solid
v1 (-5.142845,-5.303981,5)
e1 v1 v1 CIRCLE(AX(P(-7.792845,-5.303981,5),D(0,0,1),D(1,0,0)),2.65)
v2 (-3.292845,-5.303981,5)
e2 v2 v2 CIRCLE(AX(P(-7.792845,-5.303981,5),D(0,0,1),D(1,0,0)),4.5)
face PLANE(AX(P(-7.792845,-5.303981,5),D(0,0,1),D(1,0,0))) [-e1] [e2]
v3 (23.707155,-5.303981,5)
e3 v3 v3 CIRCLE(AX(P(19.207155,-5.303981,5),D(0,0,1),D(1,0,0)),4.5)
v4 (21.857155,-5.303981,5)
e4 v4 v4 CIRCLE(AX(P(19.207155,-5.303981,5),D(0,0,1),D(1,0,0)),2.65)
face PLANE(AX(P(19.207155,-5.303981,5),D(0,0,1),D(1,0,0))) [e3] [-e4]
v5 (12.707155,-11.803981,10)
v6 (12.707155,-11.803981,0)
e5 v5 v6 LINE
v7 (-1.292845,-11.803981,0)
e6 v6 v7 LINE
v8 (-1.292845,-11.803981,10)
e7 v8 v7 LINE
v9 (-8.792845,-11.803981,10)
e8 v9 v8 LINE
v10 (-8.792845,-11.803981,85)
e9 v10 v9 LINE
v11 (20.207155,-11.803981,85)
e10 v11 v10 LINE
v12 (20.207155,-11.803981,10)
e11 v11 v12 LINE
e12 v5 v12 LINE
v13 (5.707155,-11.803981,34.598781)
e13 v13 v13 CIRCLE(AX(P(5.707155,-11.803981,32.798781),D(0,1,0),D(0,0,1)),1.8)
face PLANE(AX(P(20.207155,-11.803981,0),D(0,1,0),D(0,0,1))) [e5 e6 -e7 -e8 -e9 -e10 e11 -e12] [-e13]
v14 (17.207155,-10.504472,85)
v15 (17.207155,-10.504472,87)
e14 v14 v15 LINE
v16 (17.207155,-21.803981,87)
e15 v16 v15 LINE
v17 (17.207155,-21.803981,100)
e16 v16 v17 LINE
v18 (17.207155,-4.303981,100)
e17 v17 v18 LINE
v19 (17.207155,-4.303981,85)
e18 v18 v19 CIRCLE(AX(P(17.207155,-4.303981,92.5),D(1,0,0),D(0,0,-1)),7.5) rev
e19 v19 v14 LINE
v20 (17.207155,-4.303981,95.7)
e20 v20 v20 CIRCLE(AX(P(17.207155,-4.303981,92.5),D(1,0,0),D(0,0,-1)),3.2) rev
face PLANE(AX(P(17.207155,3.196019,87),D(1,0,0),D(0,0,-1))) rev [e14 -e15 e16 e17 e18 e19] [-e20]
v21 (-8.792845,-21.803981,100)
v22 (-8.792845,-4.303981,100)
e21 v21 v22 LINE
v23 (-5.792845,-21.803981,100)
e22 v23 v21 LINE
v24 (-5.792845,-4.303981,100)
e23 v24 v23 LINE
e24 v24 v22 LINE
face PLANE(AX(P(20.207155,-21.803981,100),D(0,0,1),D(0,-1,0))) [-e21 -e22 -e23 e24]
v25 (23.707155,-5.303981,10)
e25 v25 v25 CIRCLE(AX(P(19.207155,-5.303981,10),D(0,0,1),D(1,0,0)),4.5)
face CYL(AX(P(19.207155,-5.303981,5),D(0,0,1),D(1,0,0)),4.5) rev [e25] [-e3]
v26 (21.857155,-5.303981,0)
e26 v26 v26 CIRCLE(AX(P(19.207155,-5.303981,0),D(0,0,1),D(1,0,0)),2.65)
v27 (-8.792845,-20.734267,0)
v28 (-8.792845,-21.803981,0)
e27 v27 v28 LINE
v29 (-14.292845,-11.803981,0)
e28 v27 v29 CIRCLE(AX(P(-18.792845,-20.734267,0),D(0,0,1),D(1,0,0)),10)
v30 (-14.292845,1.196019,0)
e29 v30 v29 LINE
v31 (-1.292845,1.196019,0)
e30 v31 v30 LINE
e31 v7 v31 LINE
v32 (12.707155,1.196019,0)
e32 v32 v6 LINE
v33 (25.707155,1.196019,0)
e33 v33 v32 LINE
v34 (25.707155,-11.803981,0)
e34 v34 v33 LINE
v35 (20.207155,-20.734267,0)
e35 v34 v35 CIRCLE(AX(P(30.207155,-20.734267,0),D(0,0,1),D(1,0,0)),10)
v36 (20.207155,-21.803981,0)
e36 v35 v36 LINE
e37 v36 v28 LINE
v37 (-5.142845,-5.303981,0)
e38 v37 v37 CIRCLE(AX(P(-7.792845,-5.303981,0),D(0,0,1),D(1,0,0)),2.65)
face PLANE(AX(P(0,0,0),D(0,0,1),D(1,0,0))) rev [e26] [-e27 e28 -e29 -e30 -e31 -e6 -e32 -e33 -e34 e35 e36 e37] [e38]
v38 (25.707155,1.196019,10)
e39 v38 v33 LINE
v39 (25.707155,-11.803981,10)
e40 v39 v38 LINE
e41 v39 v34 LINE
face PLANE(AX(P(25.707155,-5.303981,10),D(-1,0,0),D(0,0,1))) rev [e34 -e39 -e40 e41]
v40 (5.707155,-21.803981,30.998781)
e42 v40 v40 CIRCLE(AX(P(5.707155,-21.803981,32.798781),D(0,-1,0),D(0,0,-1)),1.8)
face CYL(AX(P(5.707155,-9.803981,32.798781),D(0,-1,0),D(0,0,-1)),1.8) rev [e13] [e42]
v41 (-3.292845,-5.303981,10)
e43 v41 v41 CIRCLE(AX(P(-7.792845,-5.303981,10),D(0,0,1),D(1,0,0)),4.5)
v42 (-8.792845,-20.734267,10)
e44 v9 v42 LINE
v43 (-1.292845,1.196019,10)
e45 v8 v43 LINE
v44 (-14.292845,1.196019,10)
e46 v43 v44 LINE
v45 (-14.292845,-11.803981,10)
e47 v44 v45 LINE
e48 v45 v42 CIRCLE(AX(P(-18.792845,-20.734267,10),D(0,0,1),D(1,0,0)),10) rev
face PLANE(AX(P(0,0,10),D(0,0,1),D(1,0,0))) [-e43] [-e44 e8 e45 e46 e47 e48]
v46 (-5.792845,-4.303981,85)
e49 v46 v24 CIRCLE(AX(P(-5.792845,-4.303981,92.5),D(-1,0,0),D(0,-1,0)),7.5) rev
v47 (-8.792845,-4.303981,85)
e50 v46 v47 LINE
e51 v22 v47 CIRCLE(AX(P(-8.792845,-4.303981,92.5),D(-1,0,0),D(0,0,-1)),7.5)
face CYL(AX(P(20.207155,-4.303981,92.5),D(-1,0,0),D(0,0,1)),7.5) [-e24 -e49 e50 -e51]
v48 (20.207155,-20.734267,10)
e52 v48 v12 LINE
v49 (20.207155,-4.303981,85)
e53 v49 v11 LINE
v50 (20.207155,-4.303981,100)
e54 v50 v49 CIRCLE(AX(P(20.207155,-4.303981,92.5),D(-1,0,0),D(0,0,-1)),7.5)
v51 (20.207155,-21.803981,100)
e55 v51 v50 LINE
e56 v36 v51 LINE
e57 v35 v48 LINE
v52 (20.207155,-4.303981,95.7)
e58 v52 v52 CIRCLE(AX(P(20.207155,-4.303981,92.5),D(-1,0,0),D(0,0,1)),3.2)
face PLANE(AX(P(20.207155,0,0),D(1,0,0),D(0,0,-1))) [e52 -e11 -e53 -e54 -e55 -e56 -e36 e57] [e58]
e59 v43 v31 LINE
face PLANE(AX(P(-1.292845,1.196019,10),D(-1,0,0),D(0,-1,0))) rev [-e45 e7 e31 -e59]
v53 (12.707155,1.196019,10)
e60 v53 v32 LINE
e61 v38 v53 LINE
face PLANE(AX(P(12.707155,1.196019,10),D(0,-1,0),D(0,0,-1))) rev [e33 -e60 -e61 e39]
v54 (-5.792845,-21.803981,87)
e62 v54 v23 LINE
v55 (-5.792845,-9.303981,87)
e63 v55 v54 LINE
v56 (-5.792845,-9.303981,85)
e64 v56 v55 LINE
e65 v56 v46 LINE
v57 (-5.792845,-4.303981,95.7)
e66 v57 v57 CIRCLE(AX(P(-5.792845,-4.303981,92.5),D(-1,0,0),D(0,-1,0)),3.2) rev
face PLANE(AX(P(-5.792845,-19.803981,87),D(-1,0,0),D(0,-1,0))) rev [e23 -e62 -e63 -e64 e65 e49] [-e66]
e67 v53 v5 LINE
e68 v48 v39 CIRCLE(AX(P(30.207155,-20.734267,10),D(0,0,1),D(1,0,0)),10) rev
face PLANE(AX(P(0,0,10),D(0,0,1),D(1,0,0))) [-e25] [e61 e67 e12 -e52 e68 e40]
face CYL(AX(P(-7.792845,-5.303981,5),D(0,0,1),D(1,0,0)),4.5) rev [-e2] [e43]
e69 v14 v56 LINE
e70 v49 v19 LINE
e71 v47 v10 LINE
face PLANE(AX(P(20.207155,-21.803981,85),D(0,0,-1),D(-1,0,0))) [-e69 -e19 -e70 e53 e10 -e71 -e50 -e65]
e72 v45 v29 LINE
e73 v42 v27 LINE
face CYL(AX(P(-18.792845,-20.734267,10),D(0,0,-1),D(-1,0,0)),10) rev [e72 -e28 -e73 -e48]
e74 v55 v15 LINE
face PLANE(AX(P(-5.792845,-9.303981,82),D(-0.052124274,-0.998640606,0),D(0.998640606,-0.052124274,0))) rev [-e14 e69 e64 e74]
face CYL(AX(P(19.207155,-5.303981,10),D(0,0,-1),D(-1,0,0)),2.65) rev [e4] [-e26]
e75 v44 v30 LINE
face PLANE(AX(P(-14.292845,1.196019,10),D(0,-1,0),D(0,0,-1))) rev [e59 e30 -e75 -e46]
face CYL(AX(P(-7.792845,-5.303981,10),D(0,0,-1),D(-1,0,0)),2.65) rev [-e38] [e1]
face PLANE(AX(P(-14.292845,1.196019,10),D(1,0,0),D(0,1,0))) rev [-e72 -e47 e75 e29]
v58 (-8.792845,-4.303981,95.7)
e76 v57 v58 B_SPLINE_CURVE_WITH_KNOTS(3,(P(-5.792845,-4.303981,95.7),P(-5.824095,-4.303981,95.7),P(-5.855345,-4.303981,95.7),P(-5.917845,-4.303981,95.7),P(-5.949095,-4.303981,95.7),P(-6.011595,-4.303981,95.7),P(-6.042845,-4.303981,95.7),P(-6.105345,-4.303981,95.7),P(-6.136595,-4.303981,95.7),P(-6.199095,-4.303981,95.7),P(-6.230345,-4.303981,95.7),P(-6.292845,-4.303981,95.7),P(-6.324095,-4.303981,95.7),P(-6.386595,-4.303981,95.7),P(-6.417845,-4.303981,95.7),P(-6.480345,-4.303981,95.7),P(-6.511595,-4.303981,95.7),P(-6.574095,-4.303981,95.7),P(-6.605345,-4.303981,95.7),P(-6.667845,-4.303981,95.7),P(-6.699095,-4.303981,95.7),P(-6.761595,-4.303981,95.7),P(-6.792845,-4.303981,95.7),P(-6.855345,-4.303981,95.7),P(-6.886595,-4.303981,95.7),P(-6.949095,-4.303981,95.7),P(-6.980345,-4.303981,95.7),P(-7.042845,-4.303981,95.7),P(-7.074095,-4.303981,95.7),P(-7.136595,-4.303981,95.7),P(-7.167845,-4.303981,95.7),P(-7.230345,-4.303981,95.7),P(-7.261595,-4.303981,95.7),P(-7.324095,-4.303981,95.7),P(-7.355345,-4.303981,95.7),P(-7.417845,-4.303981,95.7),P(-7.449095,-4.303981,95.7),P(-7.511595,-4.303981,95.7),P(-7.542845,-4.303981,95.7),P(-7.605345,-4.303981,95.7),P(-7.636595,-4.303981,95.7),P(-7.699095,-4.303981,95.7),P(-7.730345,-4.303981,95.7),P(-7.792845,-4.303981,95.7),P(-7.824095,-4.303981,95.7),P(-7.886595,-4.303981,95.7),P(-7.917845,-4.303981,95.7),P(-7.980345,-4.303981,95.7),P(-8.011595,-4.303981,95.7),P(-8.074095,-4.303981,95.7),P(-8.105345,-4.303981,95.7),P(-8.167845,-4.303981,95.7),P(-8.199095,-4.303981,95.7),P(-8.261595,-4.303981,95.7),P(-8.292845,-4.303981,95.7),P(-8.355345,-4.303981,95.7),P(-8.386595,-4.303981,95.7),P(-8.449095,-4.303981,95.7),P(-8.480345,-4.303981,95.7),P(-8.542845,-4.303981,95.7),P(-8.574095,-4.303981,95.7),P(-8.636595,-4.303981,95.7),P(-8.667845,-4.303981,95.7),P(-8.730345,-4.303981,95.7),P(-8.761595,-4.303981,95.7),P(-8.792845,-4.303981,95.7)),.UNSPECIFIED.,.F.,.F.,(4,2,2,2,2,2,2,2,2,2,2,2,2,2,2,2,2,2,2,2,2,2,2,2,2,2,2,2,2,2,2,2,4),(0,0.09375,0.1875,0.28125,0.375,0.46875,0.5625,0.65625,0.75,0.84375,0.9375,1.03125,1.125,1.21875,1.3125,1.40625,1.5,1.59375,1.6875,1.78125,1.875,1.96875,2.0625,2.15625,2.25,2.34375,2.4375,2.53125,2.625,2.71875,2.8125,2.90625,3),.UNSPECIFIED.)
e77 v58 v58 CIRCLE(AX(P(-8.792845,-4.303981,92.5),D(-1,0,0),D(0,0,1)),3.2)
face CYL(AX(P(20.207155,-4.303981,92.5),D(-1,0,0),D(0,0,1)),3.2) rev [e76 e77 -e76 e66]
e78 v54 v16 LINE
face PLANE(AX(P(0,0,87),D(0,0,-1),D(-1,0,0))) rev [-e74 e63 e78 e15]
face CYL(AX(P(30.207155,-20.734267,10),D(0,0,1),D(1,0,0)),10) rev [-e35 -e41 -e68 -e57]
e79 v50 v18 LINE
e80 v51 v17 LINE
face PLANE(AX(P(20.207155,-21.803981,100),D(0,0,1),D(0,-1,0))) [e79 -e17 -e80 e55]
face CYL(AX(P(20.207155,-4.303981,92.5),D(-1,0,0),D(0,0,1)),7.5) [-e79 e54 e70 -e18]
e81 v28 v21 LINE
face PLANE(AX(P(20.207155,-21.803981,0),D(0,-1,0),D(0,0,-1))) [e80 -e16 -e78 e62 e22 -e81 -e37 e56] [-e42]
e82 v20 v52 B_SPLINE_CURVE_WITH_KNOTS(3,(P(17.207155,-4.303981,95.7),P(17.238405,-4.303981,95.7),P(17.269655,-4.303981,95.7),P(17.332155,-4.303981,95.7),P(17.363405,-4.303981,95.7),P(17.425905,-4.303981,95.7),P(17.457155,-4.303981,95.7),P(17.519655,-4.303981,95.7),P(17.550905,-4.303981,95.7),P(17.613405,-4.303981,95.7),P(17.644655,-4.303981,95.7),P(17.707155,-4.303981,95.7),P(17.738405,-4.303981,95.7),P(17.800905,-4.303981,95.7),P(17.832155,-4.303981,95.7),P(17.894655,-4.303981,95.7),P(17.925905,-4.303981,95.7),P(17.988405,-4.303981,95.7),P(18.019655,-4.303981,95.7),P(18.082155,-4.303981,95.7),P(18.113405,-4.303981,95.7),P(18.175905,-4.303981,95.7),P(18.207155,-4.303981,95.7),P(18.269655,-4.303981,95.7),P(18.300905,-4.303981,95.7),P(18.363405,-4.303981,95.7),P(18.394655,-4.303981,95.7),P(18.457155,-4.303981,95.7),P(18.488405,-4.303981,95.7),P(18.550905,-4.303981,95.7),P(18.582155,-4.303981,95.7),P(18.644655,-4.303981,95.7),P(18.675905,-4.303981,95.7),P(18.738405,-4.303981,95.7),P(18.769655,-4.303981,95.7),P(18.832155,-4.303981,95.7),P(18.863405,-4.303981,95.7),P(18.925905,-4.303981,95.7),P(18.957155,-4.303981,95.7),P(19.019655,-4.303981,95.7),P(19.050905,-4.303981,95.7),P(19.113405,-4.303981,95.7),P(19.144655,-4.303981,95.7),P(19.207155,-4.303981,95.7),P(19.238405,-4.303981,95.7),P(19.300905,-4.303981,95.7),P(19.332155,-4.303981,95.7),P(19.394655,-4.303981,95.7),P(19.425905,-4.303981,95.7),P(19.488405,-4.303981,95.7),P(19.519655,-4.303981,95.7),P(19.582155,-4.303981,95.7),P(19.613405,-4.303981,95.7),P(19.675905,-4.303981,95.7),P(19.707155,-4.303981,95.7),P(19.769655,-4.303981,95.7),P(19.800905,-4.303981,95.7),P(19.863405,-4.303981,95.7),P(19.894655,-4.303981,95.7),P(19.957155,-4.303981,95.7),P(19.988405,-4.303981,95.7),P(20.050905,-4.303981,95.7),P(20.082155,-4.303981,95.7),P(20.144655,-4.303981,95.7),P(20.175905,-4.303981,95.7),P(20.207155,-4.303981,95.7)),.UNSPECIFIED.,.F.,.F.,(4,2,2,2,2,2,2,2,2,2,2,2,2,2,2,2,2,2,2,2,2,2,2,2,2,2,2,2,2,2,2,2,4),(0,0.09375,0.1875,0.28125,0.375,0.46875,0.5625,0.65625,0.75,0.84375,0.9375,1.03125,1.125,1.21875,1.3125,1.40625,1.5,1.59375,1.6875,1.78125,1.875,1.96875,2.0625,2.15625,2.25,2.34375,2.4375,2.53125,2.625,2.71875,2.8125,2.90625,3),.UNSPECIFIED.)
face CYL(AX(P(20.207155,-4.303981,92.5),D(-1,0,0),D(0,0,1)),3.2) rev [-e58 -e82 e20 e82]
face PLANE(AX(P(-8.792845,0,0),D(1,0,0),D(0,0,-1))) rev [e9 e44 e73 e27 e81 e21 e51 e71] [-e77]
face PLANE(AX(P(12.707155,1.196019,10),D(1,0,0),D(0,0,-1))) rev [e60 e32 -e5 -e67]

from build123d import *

# Parameters (mm, degrees)
SKETCH_1_W           = 13
SKETCH_1_H           = 13
SKETCH_1_R           = 2.65
EXTRUDE_1_DEPTH      = 10
EXTRUDE_1_2_DEPTH    = 10
SKETCH_2_R           = 4.5
CUT_EXTRUDE_2_DEPTH  = 5
EXTRUDE_2_DEPTH      = 14.5
EXTRUDE_2_DEPTH_BACK = 14.5
SKETCH_4_W           = 85
SKETCH_4_H           = 10
FILLET_6_R           = 10
SKETCH_9_R           = 3.2
EXTRUDE_3_DEPTH      = 29
CUT_EXTRUDE_6_DEPTH  = 13
CUT_EXTRUDE_7_DEPTH  = 5
SKETCH_12_R          = 1.8
CUT_EXTRUDE_8_DEPTH  = 12


with BuildPart() as part:
    # 草图1 → 凸台-拉伸1 (new body)
    with BuildSketch(Plane.XY):
        with Locations((-7.792845361, -5.303981357)):
            Rectangle(SKETCH_1_W, SKETCH_1_H)
        with Locations((-7.792845361, -5.303981357)):
            Circle(SKETCH_1_R, mode=Mode.SUBTRACT)
    extrude(amount=EXTRUDE_1_DEPTH)


with BuildPart() as body_2:
    # 草图1 → Extrude 1 2 (new body)
    with BuildSketch(Plane.XY):
        Polygon((12.707154639, 1.196018643), (25.707154639, 1.196018643), (25.707154639, -5.303981357), (25.707154639, -11.803981357), (12.707154639, -11.803981357), align=None)
        with Locations((19.207154639, -5.303981357)):
            Circle(SKETCH_1_R, mode=Mode.SUBTRACT)
    extrude(amount=EXTRUDE_1_2_DEPTH)


with BuildPart() as cut_extrude_2_tool:
    # 草图2 → 切除-拉伸2 (new body)
    with BuildSketch(Plane.XY.offset(10)):
        with Locations((-7.792845361, -5.303981357)):
            Circle(SKETCH_2_R)
        with Locations((19.207154639, -5.303981357)):
            Circle(SKETCH_2_R)
    extrude(amount=-CUT_EXTRUDE_2_DEPTH)


with BuildPart() as part_1:
    add(part.part)

    # 切除-拉伸2: cut by cut_extrude_2_tool
    add(cut_extrude_2_tool.part, mode=Mode.SUBTRACT)



with BuildPart() as body_2_1:
    add(body_2.part)

    # 切除-拉伸2: cut by cut_extrude_2_tool
    add(cut_extrude_2_tool.part, mode=Mode.SUBTRACT)


with BuildPart() as part_2:
    add(part_1.part)

    add(body_2_1.part)  # 凸台-拉伸2 merges body 2
    # 草图4 → 凸台-拉伸2 (add, two sides: drawn at the far end of the back side and taken through both)
    with BuildSketch(Plane.ZY.offset(-5.707154639).offset(-EXTRUDE_2_DEPTH_BACK)):
        with Locations((42.5, -16.803981357)):
            Rectangle(SKETCH_4_W, SKETCH_4_H)
    extrude(amount=EXTRUDE_2_DEPTH + EXTRUDE_2_DEPTH_BACK)

    # 圆角6
    # the kernel refuses this fillet: 10 mm, written as the material it adds along each edge
    with BuildSketch(Plane(origin=(20.207154639, -11.803981357, 0), x_dir=(0, -1, 0), z_dir=(0, 0, 1))) as fillet_6_piece_1:
        with BuildLine():
            CenterArc((8.93028555, 10), FILLET_6_R, 206.74368395, 63.25631605)
            Line((0, 5.5), (0, 0))
            Line((0, 0), (8.93028555, 0))
        make_face()
    extrude(amount=10)
    with BuildSketch(Plane(origin=(-8.792845361, -11.803981357, 0), x_dir=(-1, 0, 0), z_dir=(0, 0, 1))) as fillet_6_piece_2:
        with BuildLine():
            CenterArc((10, 8.93028555), FILLET_6_R, 180, 63.25631605)
            Line((0, 8.93028555), (0, 0))
            Line((0, 0), (5.5, 0))
        make_face()
    extrude(amount=10)

    # 草图9 → 凸台-拉伸3 (add)
    with BuildSketch(Plane.ZY.offset(8.792845361)):
        with BuildLine():
            Line((85, -21.803981357), (100, -21.803981357))
            Line((100, -21.803981357), (100, -4.303981357))
            ThreePointArc((100, -4.303981357), (92.5, 3.196018643), (85, -4.303981357))
            Line((85, -4.303981357), (85, -21.803981357))
        make_face()
        with Locations((92.5, -4.303981357)):
            Circle(SKETCH_9_R, mode=Mode.SUBTRACT)
    extrude(amount=-EXTRUDE_3_DEPTH)

    # 草图10 → 切除-拉伸6 (cut)
    with BuildSketch(Plane.XY.offset(100)):
        Polygon((17.207154639, 3.196018643), (17.207154639, -19.803981357), (17.207154639, -21.803981357), (-5.792845361, -21.803981357), (-5.792845361, -19.803981357), (-5.792845361, 3.196018643), align=None)
    extrude(amount=-CUT_EXTRUDE_6_DEPTH, mode=Mode.SUBTRACT)

    # 草图11 → 切除-拉伸7 (cut)
    with BuildSketch(Plane.XY.offset(87)):
        Polygon((-5.792845361, 3.128632746), (-5.792845361, -9.303981357), (17.207154639, -10.5044716), (17.207154639, 3.128632746), align=None)
    extrude(amount=-CUT_EXTRUDE_7_DEPTH, mode=Mode.SUBTRACT)

    # 草图12 → 切除-拉伸8 (cut)
    with BuildSketch(Plane.XZ.offset(21.803981357)):
        with Locations(Location((5.707154639, 32.798781039, 0), (0, 0, 270))):
            Circle(SKETCH_12_R)
        with Locations((5.707154639, 95.098664418)):
            Circle(SKETCH_12_R)
    extrude(amount=-CUT_EXTRUDE_8_DEPTH, mode=Mode.SUBTRACT)


solid = part_2.part
